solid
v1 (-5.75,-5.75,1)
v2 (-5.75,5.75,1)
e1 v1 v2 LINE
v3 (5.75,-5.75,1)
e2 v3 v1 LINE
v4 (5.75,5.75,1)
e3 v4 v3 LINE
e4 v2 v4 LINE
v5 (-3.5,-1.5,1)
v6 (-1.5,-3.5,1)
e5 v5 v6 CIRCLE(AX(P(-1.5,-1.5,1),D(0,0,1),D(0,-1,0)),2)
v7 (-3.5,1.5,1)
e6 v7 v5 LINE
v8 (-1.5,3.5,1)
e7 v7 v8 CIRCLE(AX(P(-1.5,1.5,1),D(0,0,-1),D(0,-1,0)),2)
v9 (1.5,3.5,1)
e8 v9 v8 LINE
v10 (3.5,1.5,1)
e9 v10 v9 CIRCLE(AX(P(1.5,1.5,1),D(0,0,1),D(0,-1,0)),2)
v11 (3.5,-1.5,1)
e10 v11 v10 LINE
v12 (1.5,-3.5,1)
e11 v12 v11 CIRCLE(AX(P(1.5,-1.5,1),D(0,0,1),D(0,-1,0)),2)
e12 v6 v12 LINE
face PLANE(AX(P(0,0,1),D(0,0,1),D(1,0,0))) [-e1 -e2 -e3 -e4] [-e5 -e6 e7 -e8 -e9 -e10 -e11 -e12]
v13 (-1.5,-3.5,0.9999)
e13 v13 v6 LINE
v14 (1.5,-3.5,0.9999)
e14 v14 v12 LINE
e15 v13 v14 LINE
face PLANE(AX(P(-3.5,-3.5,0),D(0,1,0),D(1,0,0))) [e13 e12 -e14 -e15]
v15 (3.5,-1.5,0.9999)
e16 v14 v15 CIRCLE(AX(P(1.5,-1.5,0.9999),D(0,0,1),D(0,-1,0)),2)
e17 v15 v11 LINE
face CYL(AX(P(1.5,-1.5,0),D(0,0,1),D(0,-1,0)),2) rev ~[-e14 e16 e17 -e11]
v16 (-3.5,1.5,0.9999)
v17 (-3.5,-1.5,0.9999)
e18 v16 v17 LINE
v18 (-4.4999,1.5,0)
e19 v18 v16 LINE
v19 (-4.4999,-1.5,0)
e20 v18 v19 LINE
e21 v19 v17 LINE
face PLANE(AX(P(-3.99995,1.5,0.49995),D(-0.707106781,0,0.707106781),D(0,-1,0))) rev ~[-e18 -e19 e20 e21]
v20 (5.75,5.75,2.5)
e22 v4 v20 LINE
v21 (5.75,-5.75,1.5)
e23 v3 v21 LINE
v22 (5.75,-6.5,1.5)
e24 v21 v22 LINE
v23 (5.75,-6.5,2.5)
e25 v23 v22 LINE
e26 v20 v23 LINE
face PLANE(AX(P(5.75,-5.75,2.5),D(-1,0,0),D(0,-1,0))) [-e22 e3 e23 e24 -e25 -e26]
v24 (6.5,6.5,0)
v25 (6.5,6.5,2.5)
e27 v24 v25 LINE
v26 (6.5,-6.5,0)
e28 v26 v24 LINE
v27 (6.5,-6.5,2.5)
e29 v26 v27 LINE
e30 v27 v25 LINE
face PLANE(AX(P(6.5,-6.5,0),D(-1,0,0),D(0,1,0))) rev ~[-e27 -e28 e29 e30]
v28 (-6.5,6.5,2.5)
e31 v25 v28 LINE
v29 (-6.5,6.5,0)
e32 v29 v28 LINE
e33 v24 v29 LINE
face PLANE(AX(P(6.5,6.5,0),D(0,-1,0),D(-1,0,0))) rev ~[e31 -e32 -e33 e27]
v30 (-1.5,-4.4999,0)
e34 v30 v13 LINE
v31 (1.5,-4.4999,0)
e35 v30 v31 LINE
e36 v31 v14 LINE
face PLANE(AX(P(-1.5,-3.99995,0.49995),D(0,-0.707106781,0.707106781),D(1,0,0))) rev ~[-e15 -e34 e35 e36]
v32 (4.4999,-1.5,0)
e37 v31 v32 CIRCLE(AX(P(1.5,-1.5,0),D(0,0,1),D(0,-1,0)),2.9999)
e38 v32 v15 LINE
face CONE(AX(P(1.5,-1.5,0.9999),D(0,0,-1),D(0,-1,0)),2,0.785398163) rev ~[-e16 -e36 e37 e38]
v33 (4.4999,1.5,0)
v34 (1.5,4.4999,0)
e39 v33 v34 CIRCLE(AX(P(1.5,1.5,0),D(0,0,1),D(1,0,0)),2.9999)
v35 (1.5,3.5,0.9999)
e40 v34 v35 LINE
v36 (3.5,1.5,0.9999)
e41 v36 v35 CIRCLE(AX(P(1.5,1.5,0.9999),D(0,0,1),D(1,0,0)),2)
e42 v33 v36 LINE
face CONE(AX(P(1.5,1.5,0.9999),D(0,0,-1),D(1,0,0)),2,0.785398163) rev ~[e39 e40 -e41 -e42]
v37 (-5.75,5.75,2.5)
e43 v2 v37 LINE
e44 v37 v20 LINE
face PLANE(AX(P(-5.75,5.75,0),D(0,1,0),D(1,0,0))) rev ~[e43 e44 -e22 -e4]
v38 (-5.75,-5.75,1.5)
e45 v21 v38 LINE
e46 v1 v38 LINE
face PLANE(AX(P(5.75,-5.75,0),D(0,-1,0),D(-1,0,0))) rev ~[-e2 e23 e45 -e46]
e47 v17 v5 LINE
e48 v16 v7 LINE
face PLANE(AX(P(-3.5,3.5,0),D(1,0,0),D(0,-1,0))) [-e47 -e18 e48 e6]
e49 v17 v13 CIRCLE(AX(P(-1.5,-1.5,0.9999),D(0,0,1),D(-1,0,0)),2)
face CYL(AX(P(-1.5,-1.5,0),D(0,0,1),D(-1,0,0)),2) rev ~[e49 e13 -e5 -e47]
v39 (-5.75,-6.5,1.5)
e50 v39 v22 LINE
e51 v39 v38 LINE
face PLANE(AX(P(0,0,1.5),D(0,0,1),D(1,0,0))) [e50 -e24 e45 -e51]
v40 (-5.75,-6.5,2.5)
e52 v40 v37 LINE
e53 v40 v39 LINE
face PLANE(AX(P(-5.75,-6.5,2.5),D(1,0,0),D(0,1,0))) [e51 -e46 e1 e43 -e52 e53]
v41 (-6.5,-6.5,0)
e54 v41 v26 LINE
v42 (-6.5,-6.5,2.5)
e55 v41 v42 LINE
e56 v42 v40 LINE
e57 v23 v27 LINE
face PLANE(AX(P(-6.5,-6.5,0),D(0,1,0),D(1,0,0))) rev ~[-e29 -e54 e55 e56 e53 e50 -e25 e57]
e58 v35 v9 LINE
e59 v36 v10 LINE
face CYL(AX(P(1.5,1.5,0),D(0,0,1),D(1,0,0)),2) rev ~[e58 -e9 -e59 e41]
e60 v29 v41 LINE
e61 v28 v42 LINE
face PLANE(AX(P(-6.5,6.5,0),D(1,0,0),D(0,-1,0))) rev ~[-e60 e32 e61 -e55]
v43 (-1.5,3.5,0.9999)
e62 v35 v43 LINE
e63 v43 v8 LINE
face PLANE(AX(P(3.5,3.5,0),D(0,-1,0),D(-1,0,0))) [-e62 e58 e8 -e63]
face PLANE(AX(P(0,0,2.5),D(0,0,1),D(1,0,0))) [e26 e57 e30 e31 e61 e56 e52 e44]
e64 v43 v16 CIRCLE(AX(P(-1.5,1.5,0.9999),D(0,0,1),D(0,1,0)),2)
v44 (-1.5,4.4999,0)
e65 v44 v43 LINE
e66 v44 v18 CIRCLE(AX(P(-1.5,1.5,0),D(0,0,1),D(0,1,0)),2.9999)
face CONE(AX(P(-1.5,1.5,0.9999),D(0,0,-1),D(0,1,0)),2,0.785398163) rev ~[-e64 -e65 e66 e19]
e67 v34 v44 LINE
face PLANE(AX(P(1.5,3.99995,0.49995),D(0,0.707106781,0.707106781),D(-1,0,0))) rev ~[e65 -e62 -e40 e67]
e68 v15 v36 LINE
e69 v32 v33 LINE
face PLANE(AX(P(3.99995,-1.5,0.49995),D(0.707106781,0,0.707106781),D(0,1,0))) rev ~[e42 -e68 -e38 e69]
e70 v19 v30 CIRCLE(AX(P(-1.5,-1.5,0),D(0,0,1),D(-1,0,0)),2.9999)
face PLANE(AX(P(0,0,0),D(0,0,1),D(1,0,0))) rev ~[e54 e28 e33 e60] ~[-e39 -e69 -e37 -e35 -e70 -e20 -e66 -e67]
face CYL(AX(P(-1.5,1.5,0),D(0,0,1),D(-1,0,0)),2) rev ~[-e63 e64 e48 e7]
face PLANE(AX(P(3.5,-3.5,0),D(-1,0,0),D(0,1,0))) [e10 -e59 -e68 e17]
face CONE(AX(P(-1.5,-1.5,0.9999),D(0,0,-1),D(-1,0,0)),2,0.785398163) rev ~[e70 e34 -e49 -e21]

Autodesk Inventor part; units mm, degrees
ref_plane "YZ Plane" through (0, 0, 0) normal (1, 0, 0) x (0, 1, 0)
ref_plane "XZ Plane" through (0, 0, 0) normal (0, 1, 0) x (-1, 0, 0)
ref_plane "XY Plane" through (0, 0, 0) normal (0, 0, 1) x (1, 0, 0)
sketch "Sketch2" plane through (0, 0, 0) normal (0, 0, 1) x (1, 0, 0)
  line L0 (-6.5, -6.5) -> (6.5, -6.5)
  line L1 (6.5, -6.5) -> (6.5, 6.5)
  line L2 (6.5, 6.5) -> (-6.5, 6.5)
  line L3 (-6.5, 6.5) -> (-6.5, -6.5)
  line L4 (-6.5, -6.5) -> (6.5, 6.5) construction
  line L5 (6.5, -6.5) -> (-6.5, 6.5) construction
  line L6 (-5.25, -5.25) -> (5.25, -5.25)
  line L7 (5.25, -5.25) -> (5.25, 5.25)
  line L8 (5.25, 5.25) -> (-5.25, 5.25)
  line L9 (-5.25, 5.25) -> (-5.25, -5.25)
  line L10 (-5.25, -5.25) -> (5.25, 5.25) construction
  line L11 (5.25, -5.25) -> (-5.25, 5.25) construction
  line L12 (-5.75, 5.75) -> (5.75, 5.75)
  line L13 (5.75, 5.75) -> (5.75, -5.75)
  line L14 (5.75, -5.75) -> (-5.75, -5.75)
  line L15 (-5.75, -5.75) -> (-5.75, 5.75)
  line L16 (-3.5, -3.5) -> (3.5, -3.5)
  line L17 (3.5, -3.5) -> (3.5, 3.5)
  line L18 (3.5, 3.5) -> (-3.5, 3.5)
  line L19 (-3.5, 3.5) -> (-3.5, -3.5)
  line L20 (-3.5, -3.5) -> (3.5, 3.5) construction
  line L21 (3.5, -3.5) -> (-3.5, 3.5) construction
  point P0 (0, 0)
  dimension "d0" = 13
  dimension "d1" = 13
  dimension "d2" = 10.5
  dimension "d3" = 10.5
  dimension "d4" = 0.5
  dimension "d5" = 7
  dimension "d6" = 7
extrude "Extrusion1" add sketch "Sketch2" along normal blind 2.5 contours L3 L2 L1 L0
extrude "Extrusion2" add sketch "Sketch2" along normal blind 1 contours L9 L8 L7 L6 | L12 L13 L14 L15 | L19 L18 L17 L16
extrude "Extrusion3" cut sketch "Sketch2" along normal blind 1 contours L19 L18 L17 L16
fillet "Fillet1" radius 2 4 edges at (-3.5, 3.5, 0.5) (-3.5, -3.5, 0.5) (3.5, 3.5, 0.5) (3.5, -3.5, 0.5)
chamfer "Chamfer1" distance 1 angle 45 8 edges at (0, 3.5, 0) (-2.9142, 2.9142, 0) (-3.5, 0, 0) (-2.9142, -2.9142, 0) (0, -3.5, 0) (2.9142, -2.9142, 0) (3.5, 0, 0) (2.9142, 2.9142, 0)
sketch "Sketch3" plane through (0, 0, 2.5) normal (0, 0, 1) x (1, 0, 0)
  line L0 (5.75, -5.75) -> (-5.75, -5.75) projected
  line L1 (-6.5, -6.5) -> (6.5, -6.5) projected
  line L2 (-5.75, -5.75) -> (5.75, -5.75)
  line L3 (5.75, -5.75) -> (5.75, -6.5)
  line L4 (5.75, -6.5) -> (-5.75, -6.5)
  line L5 (-5.75, -6.5) -> (-5.75, -5.75)
  point P0 (0, 0)
  dimension "d17" = 11.5
extrude "Extrusion4" cut sketch "Sketch3" against normal blind 1
properties part number "Optical module_lid"
